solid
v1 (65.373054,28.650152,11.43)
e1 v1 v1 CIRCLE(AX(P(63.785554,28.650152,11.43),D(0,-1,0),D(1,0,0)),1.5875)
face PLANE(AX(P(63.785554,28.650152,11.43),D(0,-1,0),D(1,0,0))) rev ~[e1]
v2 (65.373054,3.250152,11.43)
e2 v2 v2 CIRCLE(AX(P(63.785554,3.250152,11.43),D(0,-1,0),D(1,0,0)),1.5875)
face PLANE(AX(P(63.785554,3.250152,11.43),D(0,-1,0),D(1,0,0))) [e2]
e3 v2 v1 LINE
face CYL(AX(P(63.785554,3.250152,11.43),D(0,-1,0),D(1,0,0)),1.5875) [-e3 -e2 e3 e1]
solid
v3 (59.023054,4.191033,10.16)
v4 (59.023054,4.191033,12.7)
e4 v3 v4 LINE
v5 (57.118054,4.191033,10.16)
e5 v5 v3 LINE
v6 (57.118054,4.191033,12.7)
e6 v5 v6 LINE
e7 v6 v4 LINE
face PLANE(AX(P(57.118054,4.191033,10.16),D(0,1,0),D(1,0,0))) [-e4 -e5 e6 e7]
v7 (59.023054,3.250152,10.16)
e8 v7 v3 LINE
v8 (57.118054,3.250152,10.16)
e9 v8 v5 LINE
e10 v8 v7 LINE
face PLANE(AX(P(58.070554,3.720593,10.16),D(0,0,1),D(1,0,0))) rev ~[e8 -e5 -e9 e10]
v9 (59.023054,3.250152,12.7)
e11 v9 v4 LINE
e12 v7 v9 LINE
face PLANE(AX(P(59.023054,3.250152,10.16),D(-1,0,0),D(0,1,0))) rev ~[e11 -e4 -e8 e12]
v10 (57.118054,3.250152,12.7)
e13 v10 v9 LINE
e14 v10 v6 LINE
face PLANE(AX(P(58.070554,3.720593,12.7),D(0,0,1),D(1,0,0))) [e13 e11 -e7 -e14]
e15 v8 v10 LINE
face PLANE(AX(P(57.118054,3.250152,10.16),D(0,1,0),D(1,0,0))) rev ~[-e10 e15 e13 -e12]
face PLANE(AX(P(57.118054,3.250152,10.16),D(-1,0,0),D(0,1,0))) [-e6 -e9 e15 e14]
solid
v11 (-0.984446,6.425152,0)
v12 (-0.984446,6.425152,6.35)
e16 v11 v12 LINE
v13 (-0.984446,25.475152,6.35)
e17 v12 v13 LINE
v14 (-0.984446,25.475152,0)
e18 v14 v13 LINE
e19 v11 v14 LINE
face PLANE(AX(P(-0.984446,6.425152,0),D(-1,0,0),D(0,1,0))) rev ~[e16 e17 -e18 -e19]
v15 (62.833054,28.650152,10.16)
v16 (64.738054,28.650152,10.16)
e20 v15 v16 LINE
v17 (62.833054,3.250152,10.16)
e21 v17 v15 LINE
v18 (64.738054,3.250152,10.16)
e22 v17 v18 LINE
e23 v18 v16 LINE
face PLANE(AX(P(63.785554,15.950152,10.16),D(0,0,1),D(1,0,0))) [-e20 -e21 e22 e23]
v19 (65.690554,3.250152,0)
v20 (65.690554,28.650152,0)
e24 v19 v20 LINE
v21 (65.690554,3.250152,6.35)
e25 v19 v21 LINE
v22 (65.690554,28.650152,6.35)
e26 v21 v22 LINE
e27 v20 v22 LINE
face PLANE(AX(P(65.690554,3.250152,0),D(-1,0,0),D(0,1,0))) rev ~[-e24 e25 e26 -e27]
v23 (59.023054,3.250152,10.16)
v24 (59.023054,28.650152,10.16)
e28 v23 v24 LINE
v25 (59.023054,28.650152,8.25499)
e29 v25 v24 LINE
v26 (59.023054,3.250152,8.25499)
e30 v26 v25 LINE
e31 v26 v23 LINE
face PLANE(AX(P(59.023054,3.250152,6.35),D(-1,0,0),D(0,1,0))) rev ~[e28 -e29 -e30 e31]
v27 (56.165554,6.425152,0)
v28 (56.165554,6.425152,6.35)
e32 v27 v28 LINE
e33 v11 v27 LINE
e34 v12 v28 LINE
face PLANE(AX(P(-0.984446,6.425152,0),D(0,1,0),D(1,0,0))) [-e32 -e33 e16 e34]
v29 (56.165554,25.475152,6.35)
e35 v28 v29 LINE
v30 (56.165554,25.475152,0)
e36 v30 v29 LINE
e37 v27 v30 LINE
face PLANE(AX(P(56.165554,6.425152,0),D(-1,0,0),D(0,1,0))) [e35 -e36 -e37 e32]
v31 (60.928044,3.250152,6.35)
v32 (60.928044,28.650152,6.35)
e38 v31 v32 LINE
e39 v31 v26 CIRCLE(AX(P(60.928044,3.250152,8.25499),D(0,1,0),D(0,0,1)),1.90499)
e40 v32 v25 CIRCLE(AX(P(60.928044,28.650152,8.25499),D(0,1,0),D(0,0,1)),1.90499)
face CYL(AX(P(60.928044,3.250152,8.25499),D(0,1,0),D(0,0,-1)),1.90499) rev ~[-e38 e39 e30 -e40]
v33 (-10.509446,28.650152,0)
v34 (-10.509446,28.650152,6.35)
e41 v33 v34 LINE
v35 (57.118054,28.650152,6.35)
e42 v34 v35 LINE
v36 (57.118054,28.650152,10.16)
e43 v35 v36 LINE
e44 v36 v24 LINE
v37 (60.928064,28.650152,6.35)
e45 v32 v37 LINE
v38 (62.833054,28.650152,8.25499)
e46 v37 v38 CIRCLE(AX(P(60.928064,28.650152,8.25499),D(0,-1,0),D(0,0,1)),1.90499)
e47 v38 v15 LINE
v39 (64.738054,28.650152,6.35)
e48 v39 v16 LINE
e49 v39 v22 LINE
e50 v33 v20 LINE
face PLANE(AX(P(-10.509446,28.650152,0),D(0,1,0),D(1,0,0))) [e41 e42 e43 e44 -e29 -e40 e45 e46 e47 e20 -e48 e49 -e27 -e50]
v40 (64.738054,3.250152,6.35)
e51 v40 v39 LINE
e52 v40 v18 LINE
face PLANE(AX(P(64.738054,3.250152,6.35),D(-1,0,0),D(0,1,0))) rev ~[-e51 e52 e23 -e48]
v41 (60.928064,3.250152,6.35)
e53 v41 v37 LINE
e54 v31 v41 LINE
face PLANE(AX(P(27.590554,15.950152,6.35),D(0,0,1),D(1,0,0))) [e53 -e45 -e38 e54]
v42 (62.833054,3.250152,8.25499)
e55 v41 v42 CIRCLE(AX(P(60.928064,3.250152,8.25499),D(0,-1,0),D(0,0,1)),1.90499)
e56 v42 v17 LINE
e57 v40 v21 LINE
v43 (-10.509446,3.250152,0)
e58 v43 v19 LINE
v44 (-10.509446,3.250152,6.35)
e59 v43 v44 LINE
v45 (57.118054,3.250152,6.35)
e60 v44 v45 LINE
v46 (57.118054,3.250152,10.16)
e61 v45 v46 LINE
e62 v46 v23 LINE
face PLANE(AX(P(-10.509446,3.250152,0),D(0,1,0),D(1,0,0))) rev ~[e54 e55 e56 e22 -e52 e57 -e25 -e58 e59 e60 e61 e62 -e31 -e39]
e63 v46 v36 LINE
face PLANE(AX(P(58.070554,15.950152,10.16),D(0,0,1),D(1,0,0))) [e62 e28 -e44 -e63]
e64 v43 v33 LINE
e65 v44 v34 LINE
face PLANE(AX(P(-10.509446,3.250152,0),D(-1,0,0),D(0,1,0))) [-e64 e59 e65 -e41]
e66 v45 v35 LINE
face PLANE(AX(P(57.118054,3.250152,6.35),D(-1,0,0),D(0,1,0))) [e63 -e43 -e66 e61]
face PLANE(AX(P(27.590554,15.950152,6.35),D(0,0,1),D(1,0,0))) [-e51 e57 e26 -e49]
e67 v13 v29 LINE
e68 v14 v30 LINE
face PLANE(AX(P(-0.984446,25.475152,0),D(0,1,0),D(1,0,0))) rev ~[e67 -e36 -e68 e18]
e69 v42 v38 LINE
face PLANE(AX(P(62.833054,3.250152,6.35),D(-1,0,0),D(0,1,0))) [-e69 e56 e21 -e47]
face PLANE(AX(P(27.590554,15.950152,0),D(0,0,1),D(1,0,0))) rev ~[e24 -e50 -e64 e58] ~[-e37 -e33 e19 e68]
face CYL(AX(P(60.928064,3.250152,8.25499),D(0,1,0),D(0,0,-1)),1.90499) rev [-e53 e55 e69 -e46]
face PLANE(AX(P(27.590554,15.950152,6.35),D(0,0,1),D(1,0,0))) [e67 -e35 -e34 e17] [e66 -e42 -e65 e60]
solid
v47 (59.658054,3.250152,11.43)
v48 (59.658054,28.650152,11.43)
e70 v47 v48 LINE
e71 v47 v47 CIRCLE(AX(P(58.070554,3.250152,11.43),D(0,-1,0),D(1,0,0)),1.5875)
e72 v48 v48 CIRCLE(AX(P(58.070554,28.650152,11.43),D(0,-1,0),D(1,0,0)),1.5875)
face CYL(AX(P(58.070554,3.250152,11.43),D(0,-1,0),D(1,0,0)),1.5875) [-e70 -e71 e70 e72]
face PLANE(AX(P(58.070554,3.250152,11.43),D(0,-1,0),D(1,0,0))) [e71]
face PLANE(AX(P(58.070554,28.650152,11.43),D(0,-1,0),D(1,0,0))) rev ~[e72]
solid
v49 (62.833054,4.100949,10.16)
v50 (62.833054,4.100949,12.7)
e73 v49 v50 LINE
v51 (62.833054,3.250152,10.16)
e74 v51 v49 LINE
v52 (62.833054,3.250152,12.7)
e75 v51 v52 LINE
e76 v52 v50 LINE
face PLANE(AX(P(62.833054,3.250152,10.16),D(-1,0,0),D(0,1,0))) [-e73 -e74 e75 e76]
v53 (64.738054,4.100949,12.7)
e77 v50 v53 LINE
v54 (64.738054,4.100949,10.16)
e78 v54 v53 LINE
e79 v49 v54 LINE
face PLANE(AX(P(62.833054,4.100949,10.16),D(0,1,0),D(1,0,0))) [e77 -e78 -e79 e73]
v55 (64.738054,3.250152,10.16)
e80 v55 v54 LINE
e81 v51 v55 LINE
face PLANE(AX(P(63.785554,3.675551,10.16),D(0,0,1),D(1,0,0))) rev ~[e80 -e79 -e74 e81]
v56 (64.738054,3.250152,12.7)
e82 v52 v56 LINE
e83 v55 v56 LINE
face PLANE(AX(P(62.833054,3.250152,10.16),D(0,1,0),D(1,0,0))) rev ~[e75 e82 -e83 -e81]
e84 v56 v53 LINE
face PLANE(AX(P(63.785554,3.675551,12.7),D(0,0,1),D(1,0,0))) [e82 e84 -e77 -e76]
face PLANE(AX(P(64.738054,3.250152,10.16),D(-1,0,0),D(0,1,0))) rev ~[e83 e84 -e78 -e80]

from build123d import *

# Parameters (mm, degrees)
F0_W      = 76.2
F0_H      = 25.4
F0_W_2    = 57.15
F0_H_2    = 19.05
F1_DEPTH  = 6.35
F3_W      = 1.905
F3_H      = 25.4
F4_DEPTH  = 3.81
F5_R      = 1.90499
F6_W      = 1.905
F6_H      = 0.8507965779
F7_DEPTH  = 2.54
F8_R      = 1.5875
F9_DEPTH  = 25.4
F10_W     = 1.905
F10_H     = 0.9408806166
F11_DEPTH = 2.54
F12_R     = 1.5875
F13_DEPTH = 25.4


# Not quite as in the source:
# - a fillet or chamfer is up to 0.001 mm smaller than in the source, because OpenCascade refuses the exact size


with BuildPart() as f1:
    # F0 (on Top) → F1 (new body)
    with BuildSketch(Plane.XY):
        with Locations((27.5905542076, 15.9501524599)):
            Rectangle(F0_W, F0_H)
        with Locations((27.5905542076, 15.9501524599)):
            Rectangle(F0_W_2, F0_H_2, mode=Mode.SUBTRACT)
    extrude(amount=F1_DEPTH)

    # F3 (on face) → F4 (join)
    with BuildSketch(Plane.XY.offset(6.35)):
        with Locations((58.0705542076, 15.9501524599)):
            Rectangle(F3_W, F3_H)
        with Locations((63.7855542076, 15.9501524599)):
            Rectangle(F3_W, F3_H)
    extrude(amount=F4_DEPTH)

    # F5 (radius 1.905 in the source; OpenCascade refuses exactly that, so slightly less here)
    f5_edges = [f1.edges().sort_by_distance(p)[0] for p in [
        (59.023054, 15.950152, 6.35),
        (62.833054, 15.950152, 6.35),
    ]]
    fillet(f5_edges, radius=F5_R)


with BuildPart() as f7:
    # F6 (on face) → F7 (new body)
    with BuildSketch(Plane.XY.offset(10.16)):
        with Locations((63.7855542076, 3.6755507489)):
            Rectangle(F6_W, F6_H)
    extrude(amount=F7_DEPTH)


with BuildPart() as f9:
    # F8 (on face) → F9 (new body, through all)
    with BuildSketch(Plane.XZ.offset(-3.2501524599)):
        with Locations((63.7855542076, 11.43)):
            Circle(F8_R)
    extrude(amount=-F9_DEPTH)


with BuildPart() as f11:
    # F10 (on face) → F11 (new body)
    with BuildSketch(Plane.XY.offset(10.16)):
        with Locations((58.0705542076, 3.7205927682)):
            Rectangle(F10_W, F10_H)
    extrude(amount=F11_DEPTH)


with BuildPart() as f13:
    # F12 (on face) → F13 (new body, through all)
    with BuildSketch(Plane.XZ.offset(-3.2501524599)):
        with Locations((58.0705542076, 11.43)):
            Circle(F12_R)
    extrude(amount=-F13_DEPTH)


solid = Compound([f1.part, f7.part, f9.part, f11.part, f13.part])
